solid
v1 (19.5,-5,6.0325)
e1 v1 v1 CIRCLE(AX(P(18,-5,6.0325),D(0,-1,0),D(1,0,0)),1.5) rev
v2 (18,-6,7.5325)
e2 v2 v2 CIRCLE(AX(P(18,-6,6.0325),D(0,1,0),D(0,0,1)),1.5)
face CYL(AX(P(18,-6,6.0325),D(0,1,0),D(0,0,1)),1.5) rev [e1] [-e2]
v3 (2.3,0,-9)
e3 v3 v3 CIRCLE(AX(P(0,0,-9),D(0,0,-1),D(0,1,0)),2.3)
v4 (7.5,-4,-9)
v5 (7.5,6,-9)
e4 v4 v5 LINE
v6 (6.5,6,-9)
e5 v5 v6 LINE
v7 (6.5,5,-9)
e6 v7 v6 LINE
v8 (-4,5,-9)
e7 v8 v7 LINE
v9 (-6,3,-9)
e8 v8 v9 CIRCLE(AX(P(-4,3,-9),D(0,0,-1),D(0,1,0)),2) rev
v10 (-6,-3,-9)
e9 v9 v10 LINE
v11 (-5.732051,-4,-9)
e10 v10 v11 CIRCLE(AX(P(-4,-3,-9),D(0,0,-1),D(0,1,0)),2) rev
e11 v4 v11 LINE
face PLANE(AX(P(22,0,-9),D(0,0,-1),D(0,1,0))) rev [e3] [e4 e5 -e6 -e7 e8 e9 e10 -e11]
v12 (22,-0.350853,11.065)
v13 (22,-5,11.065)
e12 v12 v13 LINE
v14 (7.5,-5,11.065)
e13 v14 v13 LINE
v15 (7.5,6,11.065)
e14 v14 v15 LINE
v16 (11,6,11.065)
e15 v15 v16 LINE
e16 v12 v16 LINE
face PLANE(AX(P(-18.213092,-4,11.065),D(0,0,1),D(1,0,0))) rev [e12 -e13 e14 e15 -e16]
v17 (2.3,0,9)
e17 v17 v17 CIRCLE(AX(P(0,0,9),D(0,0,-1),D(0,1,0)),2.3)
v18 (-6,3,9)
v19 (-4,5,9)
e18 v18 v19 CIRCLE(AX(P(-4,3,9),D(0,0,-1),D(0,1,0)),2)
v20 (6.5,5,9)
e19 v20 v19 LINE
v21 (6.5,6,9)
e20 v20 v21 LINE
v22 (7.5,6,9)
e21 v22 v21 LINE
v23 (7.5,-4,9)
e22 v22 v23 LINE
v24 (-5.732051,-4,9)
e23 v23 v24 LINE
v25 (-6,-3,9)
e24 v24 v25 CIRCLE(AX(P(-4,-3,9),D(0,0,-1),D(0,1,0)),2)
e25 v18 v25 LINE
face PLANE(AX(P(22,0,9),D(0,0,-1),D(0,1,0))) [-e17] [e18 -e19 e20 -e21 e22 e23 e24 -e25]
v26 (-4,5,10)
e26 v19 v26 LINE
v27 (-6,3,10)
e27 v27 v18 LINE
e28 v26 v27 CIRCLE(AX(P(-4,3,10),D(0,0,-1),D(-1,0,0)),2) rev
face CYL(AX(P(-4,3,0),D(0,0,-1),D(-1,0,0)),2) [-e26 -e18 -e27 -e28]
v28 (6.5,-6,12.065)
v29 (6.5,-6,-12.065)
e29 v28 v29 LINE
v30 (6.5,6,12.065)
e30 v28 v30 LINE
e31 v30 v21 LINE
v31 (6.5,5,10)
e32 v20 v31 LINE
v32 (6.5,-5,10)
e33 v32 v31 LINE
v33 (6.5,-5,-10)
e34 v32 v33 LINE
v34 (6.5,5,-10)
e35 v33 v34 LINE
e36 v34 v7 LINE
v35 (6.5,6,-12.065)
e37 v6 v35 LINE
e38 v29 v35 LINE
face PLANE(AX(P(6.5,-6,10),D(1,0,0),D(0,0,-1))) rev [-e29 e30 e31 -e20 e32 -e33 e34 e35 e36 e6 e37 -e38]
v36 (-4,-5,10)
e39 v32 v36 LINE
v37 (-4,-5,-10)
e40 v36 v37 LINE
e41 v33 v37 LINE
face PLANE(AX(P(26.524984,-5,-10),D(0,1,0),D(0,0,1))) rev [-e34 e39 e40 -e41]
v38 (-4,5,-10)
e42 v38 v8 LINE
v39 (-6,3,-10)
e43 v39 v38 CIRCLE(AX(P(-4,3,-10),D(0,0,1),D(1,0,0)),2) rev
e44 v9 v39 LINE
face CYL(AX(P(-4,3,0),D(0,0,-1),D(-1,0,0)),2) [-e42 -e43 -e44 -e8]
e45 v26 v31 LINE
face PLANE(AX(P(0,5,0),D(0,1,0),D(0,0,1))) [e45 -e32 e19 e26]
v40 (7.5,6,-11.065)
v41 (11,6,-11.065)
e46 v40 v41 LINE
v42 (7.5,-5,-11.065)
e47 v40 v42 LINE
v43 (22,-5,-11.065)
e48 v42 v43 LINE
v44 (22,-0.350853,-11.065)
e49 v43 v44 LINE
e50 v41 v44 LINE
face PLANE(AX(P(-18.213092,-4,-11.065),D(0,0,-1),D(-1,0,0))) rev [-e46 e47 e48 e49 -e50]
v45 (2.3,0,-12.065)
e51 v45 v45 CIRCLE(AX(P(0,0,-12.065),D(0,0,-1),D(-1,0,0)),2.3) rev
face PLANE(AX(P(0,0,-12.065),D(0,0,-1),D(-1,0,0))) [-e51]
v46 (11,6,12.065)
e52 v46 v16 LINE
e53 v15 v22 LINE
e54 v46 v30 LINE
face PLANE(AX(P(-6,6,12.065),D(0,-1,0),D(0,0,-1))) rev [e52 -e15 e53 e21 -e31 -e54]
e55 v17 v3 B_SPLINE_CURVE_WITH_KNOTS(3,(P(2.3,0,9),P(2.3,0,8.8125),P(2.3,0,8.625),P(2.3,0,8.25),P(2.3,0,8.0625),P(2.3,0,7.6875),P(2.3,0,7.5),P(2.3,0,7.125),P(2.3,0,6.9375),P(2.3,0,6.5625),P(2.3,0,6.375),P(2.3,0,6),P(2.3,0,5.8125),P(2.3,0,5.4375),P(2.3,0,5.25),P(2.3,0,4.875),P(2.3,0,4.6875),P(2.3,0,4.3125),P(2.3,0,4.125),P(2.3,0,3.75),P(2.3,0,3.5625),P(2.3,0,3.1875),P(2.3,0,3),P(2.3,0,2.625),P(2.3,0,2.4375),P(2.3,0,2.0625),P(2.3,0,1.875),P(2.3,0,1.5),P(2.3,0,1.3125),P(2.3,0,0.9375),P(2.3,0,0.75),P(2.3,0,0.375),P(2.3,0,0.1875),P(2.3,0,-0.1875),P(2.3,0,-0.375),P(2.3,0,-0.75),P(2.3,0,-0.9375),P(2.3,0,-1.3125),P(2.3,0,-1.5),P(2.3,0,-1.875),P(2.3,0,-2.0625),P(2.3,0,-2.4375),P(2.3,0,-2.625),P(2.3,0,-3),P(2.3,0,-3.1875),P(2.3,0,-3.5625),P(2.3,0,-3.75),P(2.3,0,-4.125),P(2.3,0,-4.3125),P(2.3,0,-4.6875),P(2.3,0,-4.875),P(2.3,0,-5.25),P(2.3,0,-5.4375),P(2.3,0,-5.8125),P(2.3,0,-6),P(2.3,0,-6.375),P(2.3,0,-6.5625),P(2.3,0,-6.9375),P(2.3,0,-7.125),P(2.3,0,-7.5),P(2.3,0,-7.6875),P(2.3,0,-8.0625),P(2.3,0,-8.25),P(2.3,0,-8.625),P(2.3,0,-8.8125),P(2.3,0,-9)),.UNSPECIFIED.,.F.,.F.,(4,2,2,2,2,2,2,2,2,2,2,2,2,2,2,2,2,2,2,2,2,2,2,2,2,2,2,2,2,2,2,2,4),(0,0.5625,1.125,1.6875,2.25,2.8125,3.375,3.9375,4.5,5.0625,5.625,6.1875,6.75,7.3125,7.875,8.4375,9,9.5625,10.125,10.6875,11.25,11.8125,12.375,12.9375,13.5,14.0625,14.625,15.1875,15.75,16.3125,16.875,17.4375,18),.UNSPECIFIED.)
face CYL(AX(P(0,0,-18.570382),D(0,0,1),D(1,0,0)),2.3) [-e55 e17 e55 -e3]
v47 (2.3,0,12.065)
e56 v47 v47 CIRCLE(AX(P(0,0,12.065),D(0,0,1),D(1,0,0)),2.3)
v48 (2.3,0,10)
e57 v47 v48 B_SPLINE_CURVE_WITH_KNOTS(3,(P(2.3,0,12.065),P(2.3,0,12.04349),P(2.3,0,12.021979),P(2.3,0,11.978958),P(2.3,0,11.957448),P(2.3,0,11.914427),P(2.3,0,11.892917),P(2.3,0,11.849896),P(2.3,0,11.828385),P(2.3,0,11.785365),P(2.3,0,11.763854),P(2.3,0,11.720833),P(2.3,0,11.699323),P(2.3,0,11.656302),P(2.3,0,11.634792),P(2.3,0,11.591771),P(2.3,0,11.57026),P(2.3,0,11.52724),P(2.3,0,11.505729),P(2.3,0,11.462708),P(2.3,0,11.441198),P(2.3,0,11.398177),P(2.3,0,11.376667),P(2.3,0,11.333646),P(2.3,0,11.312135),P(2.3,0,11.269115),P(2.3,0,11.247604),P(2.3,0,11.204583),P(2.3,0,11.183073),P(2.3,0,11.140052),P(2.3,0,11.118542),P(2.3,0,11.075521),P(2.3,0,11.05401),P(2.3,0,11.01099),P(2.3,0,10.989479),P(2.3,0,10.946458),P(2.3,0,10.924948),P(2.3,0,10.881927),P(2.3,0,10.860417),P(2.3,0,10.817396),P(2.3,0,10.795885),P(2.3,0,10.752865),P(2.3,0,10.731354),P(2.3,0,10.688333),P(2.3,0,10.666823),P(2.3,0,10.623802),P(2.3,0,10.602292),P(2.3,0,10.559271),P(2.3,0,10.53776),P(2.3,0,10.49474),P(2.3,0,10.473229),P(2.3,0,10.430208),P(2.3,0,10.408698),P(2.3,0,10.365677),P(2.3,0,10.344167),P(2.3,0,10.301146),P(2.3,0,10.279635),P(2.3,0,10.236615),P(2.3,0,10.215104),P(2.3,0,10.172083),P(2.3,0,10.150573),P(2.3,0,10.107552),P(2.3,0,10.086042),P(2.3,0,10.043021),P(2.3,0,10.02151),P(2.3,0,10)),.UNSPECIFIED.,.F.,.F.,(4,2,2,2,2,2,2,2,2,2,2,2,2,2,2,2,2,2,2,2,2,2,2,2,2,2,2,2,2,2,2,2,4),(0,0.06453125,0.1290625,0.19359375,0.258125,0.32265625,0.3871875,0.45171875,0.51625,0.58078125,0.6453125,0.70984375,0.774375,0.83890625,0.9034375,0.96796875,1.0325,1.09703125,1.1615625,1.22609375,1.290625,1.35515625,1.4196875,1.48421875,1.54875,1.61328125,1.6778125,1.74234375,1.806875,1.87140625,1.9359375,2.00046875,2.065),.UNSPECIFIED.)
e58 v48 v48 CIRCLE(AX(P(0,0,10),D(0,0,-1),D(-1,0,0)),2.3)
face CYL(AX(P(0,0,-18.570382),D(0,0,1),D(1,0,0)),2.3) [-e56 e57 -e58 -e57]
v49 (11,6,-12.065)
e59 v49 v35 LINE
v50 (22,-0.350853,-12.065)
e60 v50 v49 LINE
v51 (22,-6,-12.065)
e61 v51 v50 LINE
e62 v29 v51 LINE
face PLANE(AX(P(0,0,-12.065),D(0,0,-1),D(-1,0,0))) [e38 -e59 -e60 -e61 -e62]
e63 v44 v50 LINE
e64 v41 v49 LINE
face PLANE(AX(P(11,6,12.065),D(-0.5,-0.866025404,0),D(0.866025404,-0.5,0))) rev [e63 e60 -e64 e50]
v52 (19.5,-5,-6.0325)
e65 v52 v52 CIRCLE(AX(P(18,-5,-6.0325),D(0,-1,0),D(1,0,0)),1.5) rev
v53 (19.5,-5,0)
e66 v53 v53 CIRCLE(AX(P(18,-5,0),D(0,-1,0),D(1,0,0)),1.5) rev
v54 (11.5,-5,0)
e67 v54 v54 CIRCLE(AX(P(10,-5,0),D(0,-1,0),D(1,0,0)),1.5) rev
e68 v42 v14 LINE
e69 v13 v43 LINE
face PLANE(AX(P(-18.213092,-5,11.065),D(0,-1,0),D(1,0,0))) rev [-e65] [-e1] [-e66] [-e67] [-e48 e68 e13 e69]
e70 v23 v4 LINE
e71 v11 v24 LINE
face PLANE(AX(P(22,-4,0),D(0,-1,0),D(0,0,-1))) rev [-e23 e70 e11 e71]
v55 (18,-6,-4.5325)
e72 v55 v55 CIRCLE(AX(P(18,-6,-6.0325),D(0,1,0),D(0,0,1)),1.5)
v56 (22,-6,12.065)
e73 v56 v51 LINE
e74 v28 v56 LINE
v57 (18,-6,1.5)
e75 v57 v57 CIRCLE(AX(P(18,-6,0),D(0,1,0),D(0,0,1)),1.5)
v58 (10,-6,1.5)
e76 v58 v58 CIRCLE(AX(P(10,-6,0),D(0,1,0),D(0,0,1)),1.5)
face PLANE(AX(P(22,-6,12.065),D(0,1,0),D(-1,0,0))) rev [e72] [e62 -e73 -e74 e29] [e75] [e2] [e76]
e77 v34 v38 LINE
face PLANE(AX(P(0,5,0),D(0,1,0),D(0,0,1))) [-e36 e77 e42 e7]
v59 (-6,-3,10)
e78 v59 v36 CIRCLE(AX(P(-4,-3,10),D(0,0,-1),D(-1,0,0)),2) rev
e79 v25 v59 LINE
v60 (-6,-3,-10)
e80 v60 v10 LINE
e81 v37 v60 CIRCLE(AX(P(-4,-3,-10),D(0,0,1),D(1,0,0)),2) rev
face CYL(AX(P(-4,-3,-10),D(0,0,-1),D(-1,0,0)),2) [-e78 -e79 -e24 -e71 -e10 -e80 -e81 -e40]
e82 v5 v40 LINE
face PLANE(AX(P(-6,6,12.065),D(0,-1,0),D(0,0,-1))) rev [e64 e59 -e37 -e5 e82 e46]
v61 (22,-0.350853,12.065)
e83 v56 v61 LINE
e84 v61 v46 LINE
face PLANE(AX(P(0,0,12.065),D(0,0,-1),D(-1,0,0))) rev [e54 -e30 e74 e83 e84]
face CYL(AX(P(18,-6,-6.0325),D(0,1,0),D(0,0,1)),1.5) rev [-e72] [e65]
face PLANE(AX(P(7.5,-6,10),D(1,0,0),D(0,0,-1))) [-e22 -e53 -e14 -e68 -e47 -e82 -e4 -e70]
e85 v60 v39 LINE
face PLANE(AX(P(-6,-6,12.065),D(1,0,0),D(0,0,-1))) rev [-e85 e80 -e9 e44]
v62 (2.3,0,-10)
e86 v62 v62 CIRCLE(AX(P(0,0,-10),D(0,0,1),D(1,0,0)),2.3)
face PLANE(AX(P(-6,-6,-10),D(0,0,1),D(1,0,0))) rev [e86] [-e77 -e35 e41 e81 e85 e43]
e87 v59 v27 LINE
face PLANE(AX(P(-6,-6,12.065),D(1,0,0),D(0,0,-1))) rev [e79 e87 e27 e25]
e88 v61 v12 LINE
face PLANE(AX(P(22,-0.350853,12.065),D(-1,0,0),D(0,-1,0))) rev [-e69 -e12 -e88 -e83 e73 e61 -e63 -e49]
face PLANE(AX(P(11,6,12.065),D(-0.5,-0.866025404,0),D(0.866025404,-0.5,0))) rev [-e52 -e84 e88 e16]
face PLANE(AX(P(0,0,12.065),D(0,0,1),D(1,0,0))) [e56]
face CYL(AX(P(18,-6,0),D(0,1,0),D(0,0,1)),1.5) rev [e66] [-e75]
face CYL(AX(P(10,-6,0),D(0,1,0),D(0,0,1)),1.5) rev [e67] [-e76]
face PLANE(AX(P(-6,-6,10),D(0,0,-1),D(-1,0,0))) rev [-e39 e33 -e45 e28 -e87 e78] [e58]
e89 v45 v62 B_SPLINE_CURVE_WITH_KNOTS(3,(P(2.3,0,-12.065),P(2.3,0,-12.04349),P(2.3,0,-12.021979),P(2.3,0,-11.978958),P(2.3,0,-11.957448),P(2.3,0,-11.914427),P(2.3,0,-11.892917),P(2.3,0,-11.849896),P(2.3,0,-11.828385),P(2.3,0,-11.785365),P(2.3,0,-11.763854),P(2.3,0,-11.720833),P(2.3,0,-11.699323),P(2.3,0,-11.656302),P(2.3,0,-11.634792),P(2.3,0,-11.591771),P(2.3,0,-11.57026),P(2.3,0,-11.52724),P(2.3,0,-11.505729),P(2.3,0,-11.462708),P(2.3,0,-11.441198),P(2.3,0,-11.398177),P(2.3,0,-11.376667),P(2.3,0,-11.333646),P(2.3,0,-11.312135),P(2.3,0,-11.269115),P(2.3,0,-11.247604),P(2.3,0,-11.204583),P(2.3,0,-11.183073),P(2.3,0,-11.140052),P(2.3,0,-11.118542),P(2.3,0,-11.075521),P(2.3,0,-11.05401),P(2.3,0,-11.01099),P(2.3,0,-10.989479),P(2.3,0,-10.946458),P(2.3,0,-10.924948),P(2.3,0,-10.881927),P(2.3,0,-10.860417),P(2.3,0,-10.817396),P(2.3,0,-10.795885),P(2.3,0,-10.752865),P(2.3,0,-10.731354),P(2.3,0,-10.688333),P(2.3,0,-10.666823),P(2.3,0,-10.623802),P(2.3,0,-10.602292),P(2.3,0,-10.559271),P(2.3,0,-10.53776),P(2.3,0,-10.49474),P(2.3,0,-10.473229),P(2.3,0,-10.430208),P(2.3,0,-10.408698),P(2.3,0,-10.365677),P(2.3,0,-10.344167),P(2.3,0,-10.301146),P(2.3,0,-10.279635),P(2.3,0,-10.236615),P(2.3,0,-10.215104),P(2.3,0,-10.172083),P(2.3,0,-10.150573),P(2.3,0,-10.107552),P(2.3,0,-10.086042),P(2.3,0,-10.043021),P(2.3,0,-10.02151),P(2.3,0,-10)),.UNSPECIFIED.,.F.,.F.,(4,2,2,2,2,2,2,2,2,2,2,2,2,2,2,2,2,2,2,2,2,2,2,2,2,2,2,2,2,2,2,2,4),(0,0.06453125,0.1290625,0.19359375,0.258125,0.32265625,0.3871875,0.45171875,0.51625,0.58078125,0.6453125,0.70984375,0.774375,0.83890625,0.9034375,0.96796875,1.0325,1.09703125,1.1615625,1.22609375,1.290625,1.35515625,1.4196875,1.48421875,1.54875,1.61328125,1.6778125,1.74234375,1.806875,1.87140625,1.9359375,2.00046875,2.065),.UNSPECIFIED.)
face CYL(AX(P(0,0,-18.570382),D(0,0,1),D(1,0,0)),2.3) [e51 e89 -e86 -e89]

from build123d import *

# Parameters (mm, degrees)
SKETCH1_R           = 2.3
BOSS_EXTRUDE1_DEPTH = 12.065
SKETCH5_R           = 1.5
SKETCH5_W           = 12.5
SKETCH5_H           = 2.065
CUT_EXTRUDE3_DEPTH  = 28.813022579
SKETCH6_W           = 18
SKETCH6_H           = 10
CUT_EXTRUDE5_DEPTH  = 32.07352933
SKETCH9_W           = 20
SKETCH9_H           = 1
CUT_EXTRUDE8_DEPTH  = 12.5
BOSS_EXTRUDE2_START = -24.13
SKETCH7_R           = 2.3
BOSS_EXTRUDE2_DEPTH = 24.13
SKETCH8_W           = 12.5
SKETCH8_H           = 1
CUT_EXTRUDE6_DEPTH  = 1
FILLET3_R           = 2
CUT_EXTRUDE9_DEPTH  = 14.5


with BuildPart() as part:
    # Sketch1 → Boss-Extrude1 (new, symmetric)
    with BuildSketch(Plane.XY):
        Polygon((22, -6), (0, -6), (-6, -6), (-6, 6), (0, 6), (11, 6), (22, -0.350852961), align=None)
        with Locations(Location((0, 0, 0), (0, 0, 180))):
            Circle(SKETCH1_R, mode=Mode.SUBTRACT)
    extrude(amount=BOSS_EXTRUDE1_DEPTH, both=True)

    # Sketch5 → Cut-Extrude3 (cut, through all)
    with BuildSketch(Plane(origin=(0, 6, 0), x_dir=(1, 0, 0), z_dir=(0, 1, 0))):
        with Locations(Location((18, 6.0325, 0), (0, 0, 270))):
            Circle(SKETCH5_R)
        with Locations(Location((18, 0, 0), (0, 0, 270))):
            Circle(SKETCH5_R)
        with Locations(Location((18, -6.0325, 0), (0, 0, 270))):
            Circle(SKETCH5_R)
        with Locations(Location((10, 0, 0), (0, 0, 270))):
            Circle(SKETCH5_R)
        with Locations((0.25, -11.0325)):
            Rectangle(SKETCH5_W, SKETCH5_H)
        with Locations((0.25, 11.0325)):
            Rectangle(SKETCH5_W, SKETCH5_H)
    extrude(amount=-CUT_EXTRUDE3_DEPTH, mode=Mode.SUBTRACT)

    # Sketch6 → Cut-Extrude5 (cut, through all)
    with BuildSketch(Plane.ZY.offset(6)):
        with Locations((0, 1)):
            Rectangle(SKETCH6_W, SKETCH6_H)
    extrude(amount=-CUT_EXTRUDE5_DEPTH, mode=Mode.SUBTRACT)

    # Sketch9 → Cut-Extrude8 (cut)
    with BuildSketch(Plane.ZY.offset(6)):
        with Locations((0, -5.5)):
            Rectangle(SKETCH9_W, SKETCH9_H)
    extrude(amount=-CUT_EXTRUDE8_DEPTH, mode=Mode.SUBTRACT)

    # Sketch7 → Boss-Extrude2 (add)
    with BuildSketch(Plane.XY.offset(12.065).offset(BOSS_EXTRUDE2_START)):
        Circle(SKETCH7_R)
    extrude(amount=BOSS_EXTRUDE2_DEPTH)

    # Sketch8 → Cut-Extrude6 (cut)
    with BuildSketch(Plane(origin=(0, 6, 0), x_dir=(1, 0, 0), z_dir=(0, 1, 0))):
        with Locations((0.25, -9.5)):
            Rectangle(SKETCH8_W, SKETCH8_H)
        with Locations((0.25, 9.5)):
            Rectangle(SKETCH8_W, SKETCH8_H)
    extrude(amount=-CUT_EXTRUDE6_DEPTH, mode=Mode.SUBTRACT)

    # Fillet3
    # the kernel refuses this fillet: 2 mm, written as the material it takes off along each edge
    with BuildSketch(Plane(origin=(-6, -5, 15), x_dir=(1, 0, 0), z_dir=(0, 0, -1))) as fillet3_piece_1:
        with BuildLine():
            CenterArc((FILLET3_R, -FILLET3_R), FILLET3_R, 90, 90)
            Line((0, -FILLET3_R), (0, 0))
            Line((0, 0), (FILLET3_R, 0))
        make_face()
    extrude(amount=30, mode=Mode.SUBTRACT)
    with BuildSketch(Plane(origin=(-6, 5, -15), x_dir=(1, 0, 0), z_dir=(0, 0, 1)), Plane(origin=(-6, 5, 4), x_dir=(1, 0, 0), z_dir=(0, 0, 1))) as fillet3_piece_2:
        with BuildLine():
            CenterArc((FILLET3_R, -FILLET3_R), FILLET3_R, 90, 90)
            Line((0, -FILLET3_R), (0, 0))
            Line((0, 0), (FILLET3_R, 0))
        make_face()
    extrude(amount=11, mode=Mode.SUBTRACT)

    # Sketch10 → Cut-Extrude9 (cut)
    with BuildSketch(Plane(origin=(22, 0, 0), x_dir=(0, 0, -1), z_dir=(1, 0, 0))):
        Polygon((-9, -4), (-9, 6), (-11.065, 6), (-11.065, -4), (-11.065, -5), (11.065, -5), (11.065, -4), (11.065, 6), (9, 6), (9, -4), align=None)
    extrude(amount=-CUT_EXTRUDE9_DEPTH, mode=Mode.SUBTRACT)


solid = part.part
